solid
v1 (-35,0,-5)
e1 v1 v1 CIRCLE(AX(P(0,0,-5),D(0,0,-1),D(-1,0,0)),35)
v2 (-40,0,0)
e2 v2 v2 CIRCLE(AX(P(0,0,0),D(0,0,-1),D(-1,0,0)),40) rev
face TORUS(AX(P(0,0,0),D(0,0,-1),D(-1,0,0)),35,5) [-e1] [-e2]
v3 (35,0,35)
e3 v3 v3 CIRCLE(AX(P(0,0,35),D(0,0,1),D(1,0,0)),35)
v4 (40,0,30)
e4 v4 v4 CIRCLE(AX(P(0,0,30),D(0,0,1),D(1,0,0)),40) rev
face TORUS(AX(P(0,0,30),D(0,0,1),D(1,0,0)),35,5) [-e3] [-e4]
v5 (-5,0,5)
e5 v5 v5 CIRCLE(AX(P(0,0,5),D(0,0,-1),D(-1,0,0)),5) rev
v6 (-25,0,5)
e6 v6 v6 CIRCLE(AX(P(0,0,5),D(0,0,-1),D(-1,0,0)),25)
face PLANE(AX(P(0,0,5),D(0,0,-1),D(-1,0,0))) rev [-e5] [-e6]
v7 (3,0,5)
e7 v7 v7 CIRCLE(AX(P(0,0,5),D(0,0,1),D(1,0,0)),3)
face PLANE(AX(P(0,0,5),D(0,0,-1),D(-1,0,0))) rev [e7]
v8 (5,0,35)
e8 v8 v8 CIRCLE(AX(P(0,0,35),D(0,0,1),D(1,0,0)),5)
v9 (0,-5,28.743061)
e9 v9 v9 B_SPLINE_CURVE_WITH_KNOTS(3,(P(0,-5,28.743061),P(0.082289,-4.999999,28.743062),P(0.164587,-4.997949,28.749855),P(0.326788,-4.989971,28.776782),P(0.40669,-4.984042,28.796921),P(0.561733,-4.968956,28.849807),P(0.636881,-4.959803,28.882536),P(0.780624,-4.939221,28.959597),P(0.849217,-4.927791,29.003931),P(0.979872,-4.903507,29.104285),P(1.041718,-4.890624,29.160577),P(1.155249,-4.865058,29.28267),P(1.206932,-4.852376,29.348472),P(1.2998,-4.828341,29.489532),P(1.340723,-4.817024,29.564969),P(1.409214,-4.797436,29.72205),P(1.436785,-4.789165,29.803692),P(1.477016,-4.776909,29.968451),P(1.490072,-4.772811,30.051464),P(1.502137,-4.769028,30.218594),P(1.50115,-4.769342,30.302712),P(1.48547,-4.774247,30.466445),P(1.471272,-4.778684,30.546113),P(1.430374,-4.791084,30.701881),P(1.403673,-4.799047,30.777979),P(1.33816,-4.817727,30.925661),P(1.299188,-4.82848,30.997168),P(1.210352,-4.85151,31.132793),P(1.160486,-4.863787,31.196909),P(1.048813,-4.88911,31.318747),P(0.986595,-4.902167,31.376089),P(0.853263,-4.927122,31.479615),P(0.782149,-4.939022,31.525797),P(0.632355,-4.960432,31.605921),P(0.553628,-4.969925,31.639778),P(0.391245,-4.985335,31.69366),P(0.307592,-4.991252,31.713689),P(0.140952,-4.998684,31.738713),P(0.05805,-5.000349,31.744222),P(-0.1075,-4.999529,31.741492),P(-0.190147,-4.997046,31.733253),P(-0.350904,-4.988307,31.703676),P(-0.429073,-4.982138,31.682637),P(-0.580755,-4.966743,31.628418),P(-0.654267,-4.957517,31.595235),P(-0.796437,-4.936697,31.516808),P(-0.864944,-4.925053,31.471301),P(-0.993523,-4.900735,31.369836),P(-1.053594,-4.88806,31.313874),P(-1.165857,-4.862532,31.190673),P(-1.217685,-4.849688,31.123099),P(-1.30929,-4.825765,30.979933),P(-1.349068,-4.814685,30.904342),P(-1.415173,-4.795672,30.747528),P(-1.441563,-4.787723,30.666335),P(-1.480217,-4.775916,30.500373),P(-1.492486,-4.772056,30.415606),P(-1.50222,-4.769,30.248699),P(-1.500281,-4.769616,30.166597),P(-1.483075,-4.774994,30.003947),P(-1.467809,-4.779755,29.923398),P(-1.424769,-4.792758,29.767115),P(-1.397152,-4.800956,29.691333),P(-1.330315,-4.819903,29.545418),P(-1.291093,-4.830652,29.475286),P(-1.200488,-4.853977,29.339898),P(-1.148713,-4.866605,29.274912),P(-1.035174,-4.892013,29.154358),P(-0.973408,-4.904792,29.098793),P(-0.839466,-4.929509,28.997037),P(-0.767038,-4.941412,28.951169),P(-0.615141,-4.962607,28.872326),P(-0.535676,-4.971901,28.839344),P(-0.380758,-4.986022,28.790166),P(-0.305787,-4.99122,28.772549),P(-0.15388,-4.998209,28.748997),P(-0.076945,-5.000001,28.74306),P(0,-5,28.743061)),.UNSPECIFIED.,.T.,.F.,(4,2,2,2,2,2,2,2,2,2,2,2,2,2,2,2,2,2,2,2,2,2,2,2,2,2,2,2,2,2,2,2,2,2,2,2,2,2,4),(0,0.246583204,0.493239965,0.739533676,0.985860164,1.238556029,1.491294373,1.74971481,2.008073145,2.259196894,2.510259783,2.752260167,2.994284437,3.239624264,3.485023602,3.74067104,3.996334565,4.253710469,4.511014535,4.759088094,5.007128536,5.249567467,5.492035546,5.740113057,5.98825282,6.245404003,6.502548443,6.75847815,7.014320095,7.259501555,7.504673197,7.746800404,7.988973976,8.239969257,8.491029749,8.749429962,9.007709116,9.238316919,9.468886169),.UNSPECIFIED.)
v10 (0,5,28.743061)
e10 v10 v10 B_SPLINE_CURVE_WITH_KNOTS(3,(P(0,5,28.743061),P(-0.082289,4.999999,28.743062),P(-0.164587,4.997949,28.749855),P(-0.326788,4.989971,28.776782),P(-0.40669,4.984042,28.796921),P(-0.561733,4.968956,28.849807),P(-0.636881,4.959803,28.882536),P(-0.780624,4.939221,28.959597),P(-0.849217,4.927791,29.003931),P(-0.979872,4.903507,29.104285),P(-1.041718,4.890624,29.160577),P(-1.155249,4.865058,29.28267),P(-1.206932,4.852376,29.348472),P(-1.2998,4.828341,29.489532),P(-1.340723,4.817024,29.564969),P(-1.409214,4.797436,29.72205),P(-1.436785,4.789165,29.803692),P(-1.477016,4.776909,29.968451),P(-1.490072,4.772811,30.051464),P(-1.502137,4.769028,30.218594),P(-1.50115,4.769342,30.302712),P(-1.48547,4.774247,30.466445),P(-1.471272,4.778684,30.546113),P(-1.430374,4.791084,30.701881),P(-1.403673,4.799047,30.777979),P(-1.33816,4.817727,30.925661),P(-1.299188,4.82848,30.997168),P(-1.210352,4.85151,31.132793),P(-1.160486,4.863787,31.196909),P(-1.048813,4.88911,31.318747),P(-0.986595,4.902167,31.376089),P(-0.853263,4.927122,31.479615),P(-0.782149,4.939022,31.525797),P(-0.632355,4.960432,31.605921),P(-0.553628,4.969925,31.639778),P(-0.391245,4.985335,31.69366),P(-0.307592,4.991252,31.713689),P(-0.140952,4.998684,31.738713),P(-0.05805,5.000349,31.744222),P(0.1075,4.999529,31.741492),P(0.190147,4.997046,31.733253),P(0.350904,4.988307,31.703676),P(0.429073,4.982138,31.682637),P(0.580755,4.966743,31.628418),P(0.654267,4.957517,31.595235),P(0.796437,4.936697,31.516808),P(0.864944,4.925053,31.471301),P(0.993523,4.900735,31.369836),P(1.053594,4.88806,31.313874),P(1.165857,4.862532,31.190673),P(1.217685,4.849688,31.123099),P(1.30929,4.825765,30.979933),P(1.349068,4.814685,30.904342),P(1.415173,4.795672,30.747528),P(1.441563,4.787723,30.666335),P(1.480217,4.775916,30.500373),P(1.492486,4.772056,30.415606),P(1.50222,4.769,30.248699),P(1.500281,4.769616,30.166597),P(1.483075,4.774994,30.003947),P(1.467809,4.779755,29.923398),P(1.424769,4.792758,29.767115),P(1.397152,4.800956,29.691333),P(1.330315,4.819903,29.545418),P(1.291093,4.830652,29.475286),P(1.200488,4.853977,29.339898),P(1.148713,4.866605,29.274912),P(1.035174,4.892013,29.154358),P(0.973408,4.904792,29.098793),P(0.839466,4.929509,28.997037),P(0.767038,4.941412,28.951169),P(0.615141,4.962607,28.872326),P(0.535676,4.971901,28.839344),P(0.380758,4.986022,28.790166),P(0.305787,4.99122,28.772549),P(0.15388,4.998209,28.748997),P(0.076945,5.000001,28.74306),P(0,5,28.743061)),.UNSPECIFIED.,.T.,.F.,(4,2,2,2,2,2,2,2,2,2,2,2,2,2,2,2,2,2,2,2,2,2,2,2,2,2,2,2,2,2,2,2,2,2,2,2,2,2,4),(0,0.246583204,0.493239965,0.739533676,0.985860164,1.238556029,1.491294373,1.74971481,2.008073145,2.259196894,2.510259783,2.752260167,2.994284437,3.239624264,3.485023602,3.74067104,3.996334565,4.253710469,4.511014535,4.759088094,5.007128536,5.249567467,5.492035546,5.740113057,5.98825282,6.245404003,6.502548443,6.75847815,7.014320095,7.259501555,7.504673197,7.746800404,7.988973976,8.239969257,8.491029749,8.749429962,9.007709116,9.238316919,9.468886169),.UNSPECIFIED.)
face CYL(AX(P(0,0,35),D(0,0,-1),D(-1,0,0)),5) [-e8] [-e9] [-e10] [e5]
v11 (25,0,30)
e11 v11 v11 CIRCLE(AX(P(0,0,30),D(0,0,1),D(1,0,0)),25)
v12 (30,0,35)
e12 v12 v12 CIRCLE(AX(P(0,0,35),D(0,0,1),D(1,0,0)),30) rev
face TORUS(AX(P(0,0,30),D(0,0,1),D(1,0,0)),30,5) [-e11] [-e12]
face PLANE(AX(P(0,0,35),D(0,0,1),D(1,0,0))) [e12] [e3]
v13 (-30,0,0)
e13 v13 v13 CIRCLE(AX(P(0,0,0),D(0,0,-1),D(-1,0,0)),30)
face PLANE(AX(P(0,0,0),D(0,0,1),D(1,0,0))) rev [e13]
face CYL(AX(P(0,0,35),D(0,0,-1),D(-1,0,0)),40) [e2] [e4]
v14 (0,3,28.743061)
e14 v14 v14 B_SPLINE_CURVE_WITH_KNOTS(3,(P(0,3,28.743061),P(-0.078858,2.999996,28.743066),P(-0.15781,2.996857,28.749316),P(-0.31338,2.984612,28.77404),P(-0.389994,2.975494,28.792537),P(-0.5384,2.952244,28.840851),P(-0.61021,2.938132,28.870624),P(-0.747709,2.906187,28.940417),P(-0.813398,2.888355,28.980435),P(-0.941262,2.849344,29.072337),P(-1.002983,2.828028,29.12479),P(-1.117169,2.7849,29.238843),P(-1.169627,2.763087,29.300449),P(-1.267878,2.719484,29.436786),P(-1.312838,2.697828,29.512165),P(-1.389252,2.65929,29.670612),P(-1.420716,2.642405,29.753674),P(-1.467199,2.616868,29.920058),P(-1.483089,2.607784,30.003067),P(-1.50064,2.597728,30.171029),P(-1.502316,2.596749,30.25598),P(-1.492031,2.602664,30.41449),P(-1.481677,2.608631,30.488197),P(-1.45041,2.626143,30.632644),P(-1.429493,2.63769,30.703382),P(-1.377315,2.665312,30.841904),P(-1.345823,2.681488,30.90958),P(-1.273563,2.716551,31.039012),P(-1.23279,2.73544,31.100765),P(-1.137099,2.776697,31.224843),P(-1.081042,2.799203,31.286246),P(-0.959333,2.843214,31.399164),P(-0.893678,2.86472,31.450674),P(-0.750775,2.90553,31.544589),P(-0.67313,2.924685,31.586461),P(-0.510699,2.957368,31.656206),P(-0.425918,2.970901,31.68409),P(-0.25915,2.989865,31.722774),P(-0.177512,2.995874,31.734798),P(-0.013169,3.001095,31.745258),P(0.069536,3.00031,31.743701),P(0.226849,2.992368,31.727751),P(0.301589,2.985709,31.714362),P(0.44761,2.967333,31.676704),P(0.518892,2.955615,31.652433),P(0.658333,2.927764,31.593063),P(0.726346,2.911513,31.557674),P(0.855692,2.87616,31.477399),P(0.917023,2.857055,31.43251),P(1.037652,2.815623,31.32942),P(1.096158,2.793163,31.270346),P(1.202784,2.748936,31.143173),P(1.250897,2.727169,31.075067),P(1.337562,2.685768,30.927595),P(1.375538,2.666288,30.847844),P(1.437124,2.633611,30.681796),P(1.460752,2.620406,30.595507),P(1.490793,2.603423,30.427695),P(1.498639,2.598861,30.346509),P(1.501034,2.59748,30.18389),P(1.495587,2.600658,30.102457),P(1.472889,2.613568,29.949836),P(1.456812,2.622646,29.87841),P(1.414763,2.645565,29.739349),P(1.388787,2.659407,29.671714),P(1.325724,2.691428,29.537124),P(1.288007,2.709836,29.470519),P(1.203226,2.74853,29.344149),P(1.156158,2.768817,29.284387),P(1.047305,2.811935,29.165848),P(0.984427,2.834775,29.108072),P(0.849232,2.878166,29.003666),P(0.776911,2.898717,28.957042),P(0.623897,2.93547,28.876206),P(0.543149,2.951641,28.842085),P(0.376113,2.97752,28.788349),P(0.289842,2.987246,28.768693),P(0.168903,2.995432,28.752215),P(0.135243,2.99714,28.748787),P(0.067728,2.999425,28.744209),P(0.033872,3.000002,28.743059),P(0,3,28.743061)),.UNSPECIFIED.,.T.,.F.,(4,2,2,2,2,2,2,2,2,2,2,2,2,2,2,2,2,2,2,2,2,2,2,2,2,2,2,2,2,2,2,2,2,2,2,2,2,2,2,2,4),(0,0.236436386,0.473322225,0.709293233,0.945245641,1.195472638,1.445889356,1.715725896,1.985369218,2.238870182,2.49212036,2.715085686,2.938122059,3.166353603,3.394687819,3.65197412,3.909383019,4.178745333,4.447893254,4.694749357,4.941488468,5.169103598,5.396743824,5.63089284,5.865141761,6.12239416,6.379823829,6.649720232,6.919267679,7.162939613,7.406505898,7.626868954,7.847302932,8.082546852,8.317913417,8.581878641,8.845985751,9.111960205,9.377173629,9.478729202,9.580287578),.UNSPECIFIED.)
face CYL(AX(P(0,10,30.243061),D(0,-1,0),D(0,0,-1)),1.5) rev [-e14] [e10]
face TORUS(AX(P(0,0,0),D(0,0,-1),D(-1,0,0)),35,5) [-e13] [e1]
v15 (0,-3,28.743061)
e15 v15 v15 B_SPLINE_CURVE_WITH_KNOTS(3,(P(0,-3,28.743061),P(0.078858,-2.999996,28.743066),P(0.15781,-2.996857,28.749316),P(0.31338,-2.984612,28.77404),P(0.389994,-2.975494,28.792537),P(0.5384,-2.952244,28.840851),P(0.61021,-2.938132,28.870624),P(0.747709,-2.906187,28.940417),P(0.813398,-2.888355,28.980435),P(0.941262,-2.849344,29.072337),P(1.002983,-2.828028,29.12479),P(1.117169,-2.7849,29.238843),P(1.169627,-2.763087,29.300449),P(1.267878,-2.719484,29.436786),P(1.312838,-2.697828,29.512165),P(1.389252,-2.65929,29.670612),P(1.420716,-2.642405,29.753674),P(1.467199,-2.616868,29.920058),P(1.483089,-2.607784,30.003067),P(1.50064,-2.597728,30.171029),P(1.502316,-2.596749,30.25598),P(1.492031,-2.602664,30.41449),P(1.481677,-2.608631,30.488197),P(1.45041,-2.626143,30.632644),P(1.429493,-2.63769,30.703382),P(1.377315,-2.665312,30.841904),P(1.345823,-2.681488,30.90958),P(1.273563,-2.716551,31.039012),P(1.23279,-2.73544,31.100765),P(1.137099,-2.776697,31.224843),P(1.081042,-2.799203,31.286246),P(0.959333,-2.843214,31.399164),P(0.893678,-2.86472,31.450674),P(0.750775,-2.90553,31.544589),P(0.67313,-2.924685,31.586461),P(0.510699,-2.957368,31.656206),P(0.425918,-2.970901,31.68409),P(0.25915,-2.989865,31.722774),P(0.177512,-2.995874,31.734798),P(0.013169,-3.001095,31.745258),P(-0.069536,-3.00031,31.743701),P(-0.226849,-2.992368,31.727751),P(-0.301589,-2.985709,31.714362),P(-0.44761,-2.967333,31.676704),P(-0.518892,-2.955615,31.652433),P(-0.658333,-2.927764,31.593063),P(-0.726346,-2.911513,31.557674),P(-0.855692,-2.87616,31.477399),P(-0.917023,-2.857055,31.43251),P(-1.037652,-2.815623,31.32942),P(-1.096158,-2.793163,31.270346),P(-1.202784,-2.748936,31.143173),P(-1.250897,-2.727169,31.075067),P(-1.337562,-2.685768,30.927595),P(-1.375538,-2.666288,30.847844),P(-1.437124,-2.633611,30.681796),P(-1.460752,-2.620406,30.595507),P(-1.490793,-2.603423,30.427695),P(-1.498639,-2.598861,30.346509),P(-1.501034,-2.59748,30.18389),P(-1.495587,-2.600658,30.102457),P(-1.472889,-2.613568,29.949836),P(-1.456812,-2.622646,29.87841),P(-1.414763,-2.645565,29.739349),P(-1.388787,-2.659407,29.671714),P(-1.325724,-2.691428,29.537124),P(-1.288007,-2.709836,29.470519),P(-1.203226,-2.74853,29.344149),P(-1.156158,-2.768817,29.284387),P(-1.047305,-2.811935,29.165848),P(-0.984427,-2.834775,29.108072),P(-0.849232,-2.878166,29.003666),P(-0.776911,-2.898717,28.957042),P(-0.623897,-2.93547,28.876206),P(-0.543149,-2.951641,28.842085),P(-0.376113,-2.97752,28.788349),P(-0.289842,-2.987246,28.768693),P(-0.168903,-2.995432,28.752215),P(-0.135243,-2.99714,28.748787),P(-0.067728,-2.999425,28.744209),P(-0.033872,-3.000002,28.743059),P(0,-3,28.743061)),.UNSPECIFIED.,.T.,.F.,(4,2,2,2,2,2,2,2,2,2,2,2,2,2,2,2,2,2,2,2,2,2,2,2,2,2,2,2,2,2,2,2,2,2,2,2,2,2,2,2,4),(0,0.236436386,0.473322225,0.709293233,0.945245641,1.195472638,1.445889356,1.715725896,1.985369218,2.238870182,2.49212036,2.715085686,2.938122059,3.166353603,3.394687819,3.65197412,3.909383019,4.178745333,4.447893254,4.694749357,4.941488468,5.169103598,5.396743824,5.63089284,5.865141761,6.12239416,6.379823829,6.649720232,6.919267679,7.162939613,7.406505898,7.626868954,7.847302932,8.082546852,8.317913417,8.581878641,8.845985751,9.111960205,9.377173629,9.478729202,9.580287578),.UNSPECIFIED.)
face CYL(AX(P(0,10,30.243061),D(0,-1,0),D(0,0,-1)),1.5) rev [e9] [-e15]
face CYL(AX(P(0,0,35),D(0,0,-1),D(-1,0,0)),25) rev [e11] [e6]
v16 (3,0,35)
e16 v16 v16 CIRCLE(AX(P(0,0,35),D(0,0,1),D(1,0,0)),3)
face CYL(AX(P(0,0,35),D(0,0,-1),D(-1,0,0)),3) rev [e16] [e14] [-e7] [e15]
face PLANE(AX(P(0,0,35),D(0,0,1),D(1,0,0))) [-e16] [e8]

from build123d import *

# Parameters (mm, degrees)
SKETCH1_R            = 40
SKETCH1_R_2          = 25
BOSS_EXTRUDE1_DEPTH  = 35
SKETCH2_R            = 40
BOSS_EXTRUDE2_DEPTH  = 5
BOSS_EXTRUDE3_START  = 5
SKETCH4_R            = 40
SKETCH4_R_2          = 30
BOSS_EXTRUDE3_DEPTH  = 5
SKETCH6_R            = 5
SKETCH6_R_2          = 3
HUB_DEPTH            = 30
FILLET1_DESIGN_R     = 5
HUB_HOLES_DEPTH      = 10
HUB_HOLES_DEPTH_BACK = 10
SKETCH8_R            = 1.5


with BuildPart() as part:
    # Sketch1 → Boss-Extrude1 (new body)
    with BuildSketch(Plane.XY):
        Circle(SKETCH1_R)
        Circle(SKETCH1_R_2, mode=Mode.SUBTRACT)
    extrude(amount=BOSS_EXTRUDE1_DEPTH)

    # Sketch2 → Boss-Extrude2 (add)
    with BuildSketch(Plane(origin=(0, 0, 0), x_dir=(-1, 0, 0), z_dir=(0, 0, -1))):
        with Locations(Location((0, 0, 0), (0, 0, 180))):
            Circle(SKETCH2_R)
    extrude(amount=-BOSS_EXTRUDE2_DEPTH)

    # Sketch4 → Boss-Extrude3 (add)
    with BuildSketch(Plane(origin=(0, 0, 0), x_dir=(-1, 0, 0), z_dir=(0, 0, -1)).offset(BOSS_EXTRUDE3_START)):
        Circle(SKETCH4_R)
        Circle(SKETCH4_R_2, mode=Mode.SUBTRACT)
    extrude(amount=-BOSS_EXTRUDE3_DEPTH)

    # Sketch6 → hub (add)
    with BuildSketch(Plane.XY.offset(5)):
        with Locations(Location((0, 0, 0), (0, 0, 180))):
            Circle(SKETCH6_R)
        Circle(SKETCH6_R_2, mode=Mode.SUBTRACT)
    extrude(amount=HUB_DEPTH)

    # Fillet1 design
    fillet1_design_edges = [part.edges().sort_by_distance(p)[0] for p in [
        (40, 0, -5),
        (30, 0, -5),
        (-40, 0, 35),
        (-25, 0, 35),
    ]]
    fillet(fillet1_design_edges, radius=FILLET1_DESIGN_R - 0.0001)  # a hair under: the kernel refuses the full size

    # Sketch8 → hub holes (cut, two sides: drawn at the far end of the back side and taken through both)
    with BuildSketch(Plane(origin=(0, 0, 0), x_dir=(1, 0, 0), z_dir=(0, 1, 0)).offset(-HUB_HOLES_DEPTH_BACK)):
        with Locations(Location((0, -30.243060778, 0), (0, 0, 90))):
            Circle(SKETCH8_R)
    extrude(amount=HUB_HOLES_DEPTH + HUB_HOLES_DEPTH_BACK, mode=Mode.SUBTRACT)


solid = part.part
